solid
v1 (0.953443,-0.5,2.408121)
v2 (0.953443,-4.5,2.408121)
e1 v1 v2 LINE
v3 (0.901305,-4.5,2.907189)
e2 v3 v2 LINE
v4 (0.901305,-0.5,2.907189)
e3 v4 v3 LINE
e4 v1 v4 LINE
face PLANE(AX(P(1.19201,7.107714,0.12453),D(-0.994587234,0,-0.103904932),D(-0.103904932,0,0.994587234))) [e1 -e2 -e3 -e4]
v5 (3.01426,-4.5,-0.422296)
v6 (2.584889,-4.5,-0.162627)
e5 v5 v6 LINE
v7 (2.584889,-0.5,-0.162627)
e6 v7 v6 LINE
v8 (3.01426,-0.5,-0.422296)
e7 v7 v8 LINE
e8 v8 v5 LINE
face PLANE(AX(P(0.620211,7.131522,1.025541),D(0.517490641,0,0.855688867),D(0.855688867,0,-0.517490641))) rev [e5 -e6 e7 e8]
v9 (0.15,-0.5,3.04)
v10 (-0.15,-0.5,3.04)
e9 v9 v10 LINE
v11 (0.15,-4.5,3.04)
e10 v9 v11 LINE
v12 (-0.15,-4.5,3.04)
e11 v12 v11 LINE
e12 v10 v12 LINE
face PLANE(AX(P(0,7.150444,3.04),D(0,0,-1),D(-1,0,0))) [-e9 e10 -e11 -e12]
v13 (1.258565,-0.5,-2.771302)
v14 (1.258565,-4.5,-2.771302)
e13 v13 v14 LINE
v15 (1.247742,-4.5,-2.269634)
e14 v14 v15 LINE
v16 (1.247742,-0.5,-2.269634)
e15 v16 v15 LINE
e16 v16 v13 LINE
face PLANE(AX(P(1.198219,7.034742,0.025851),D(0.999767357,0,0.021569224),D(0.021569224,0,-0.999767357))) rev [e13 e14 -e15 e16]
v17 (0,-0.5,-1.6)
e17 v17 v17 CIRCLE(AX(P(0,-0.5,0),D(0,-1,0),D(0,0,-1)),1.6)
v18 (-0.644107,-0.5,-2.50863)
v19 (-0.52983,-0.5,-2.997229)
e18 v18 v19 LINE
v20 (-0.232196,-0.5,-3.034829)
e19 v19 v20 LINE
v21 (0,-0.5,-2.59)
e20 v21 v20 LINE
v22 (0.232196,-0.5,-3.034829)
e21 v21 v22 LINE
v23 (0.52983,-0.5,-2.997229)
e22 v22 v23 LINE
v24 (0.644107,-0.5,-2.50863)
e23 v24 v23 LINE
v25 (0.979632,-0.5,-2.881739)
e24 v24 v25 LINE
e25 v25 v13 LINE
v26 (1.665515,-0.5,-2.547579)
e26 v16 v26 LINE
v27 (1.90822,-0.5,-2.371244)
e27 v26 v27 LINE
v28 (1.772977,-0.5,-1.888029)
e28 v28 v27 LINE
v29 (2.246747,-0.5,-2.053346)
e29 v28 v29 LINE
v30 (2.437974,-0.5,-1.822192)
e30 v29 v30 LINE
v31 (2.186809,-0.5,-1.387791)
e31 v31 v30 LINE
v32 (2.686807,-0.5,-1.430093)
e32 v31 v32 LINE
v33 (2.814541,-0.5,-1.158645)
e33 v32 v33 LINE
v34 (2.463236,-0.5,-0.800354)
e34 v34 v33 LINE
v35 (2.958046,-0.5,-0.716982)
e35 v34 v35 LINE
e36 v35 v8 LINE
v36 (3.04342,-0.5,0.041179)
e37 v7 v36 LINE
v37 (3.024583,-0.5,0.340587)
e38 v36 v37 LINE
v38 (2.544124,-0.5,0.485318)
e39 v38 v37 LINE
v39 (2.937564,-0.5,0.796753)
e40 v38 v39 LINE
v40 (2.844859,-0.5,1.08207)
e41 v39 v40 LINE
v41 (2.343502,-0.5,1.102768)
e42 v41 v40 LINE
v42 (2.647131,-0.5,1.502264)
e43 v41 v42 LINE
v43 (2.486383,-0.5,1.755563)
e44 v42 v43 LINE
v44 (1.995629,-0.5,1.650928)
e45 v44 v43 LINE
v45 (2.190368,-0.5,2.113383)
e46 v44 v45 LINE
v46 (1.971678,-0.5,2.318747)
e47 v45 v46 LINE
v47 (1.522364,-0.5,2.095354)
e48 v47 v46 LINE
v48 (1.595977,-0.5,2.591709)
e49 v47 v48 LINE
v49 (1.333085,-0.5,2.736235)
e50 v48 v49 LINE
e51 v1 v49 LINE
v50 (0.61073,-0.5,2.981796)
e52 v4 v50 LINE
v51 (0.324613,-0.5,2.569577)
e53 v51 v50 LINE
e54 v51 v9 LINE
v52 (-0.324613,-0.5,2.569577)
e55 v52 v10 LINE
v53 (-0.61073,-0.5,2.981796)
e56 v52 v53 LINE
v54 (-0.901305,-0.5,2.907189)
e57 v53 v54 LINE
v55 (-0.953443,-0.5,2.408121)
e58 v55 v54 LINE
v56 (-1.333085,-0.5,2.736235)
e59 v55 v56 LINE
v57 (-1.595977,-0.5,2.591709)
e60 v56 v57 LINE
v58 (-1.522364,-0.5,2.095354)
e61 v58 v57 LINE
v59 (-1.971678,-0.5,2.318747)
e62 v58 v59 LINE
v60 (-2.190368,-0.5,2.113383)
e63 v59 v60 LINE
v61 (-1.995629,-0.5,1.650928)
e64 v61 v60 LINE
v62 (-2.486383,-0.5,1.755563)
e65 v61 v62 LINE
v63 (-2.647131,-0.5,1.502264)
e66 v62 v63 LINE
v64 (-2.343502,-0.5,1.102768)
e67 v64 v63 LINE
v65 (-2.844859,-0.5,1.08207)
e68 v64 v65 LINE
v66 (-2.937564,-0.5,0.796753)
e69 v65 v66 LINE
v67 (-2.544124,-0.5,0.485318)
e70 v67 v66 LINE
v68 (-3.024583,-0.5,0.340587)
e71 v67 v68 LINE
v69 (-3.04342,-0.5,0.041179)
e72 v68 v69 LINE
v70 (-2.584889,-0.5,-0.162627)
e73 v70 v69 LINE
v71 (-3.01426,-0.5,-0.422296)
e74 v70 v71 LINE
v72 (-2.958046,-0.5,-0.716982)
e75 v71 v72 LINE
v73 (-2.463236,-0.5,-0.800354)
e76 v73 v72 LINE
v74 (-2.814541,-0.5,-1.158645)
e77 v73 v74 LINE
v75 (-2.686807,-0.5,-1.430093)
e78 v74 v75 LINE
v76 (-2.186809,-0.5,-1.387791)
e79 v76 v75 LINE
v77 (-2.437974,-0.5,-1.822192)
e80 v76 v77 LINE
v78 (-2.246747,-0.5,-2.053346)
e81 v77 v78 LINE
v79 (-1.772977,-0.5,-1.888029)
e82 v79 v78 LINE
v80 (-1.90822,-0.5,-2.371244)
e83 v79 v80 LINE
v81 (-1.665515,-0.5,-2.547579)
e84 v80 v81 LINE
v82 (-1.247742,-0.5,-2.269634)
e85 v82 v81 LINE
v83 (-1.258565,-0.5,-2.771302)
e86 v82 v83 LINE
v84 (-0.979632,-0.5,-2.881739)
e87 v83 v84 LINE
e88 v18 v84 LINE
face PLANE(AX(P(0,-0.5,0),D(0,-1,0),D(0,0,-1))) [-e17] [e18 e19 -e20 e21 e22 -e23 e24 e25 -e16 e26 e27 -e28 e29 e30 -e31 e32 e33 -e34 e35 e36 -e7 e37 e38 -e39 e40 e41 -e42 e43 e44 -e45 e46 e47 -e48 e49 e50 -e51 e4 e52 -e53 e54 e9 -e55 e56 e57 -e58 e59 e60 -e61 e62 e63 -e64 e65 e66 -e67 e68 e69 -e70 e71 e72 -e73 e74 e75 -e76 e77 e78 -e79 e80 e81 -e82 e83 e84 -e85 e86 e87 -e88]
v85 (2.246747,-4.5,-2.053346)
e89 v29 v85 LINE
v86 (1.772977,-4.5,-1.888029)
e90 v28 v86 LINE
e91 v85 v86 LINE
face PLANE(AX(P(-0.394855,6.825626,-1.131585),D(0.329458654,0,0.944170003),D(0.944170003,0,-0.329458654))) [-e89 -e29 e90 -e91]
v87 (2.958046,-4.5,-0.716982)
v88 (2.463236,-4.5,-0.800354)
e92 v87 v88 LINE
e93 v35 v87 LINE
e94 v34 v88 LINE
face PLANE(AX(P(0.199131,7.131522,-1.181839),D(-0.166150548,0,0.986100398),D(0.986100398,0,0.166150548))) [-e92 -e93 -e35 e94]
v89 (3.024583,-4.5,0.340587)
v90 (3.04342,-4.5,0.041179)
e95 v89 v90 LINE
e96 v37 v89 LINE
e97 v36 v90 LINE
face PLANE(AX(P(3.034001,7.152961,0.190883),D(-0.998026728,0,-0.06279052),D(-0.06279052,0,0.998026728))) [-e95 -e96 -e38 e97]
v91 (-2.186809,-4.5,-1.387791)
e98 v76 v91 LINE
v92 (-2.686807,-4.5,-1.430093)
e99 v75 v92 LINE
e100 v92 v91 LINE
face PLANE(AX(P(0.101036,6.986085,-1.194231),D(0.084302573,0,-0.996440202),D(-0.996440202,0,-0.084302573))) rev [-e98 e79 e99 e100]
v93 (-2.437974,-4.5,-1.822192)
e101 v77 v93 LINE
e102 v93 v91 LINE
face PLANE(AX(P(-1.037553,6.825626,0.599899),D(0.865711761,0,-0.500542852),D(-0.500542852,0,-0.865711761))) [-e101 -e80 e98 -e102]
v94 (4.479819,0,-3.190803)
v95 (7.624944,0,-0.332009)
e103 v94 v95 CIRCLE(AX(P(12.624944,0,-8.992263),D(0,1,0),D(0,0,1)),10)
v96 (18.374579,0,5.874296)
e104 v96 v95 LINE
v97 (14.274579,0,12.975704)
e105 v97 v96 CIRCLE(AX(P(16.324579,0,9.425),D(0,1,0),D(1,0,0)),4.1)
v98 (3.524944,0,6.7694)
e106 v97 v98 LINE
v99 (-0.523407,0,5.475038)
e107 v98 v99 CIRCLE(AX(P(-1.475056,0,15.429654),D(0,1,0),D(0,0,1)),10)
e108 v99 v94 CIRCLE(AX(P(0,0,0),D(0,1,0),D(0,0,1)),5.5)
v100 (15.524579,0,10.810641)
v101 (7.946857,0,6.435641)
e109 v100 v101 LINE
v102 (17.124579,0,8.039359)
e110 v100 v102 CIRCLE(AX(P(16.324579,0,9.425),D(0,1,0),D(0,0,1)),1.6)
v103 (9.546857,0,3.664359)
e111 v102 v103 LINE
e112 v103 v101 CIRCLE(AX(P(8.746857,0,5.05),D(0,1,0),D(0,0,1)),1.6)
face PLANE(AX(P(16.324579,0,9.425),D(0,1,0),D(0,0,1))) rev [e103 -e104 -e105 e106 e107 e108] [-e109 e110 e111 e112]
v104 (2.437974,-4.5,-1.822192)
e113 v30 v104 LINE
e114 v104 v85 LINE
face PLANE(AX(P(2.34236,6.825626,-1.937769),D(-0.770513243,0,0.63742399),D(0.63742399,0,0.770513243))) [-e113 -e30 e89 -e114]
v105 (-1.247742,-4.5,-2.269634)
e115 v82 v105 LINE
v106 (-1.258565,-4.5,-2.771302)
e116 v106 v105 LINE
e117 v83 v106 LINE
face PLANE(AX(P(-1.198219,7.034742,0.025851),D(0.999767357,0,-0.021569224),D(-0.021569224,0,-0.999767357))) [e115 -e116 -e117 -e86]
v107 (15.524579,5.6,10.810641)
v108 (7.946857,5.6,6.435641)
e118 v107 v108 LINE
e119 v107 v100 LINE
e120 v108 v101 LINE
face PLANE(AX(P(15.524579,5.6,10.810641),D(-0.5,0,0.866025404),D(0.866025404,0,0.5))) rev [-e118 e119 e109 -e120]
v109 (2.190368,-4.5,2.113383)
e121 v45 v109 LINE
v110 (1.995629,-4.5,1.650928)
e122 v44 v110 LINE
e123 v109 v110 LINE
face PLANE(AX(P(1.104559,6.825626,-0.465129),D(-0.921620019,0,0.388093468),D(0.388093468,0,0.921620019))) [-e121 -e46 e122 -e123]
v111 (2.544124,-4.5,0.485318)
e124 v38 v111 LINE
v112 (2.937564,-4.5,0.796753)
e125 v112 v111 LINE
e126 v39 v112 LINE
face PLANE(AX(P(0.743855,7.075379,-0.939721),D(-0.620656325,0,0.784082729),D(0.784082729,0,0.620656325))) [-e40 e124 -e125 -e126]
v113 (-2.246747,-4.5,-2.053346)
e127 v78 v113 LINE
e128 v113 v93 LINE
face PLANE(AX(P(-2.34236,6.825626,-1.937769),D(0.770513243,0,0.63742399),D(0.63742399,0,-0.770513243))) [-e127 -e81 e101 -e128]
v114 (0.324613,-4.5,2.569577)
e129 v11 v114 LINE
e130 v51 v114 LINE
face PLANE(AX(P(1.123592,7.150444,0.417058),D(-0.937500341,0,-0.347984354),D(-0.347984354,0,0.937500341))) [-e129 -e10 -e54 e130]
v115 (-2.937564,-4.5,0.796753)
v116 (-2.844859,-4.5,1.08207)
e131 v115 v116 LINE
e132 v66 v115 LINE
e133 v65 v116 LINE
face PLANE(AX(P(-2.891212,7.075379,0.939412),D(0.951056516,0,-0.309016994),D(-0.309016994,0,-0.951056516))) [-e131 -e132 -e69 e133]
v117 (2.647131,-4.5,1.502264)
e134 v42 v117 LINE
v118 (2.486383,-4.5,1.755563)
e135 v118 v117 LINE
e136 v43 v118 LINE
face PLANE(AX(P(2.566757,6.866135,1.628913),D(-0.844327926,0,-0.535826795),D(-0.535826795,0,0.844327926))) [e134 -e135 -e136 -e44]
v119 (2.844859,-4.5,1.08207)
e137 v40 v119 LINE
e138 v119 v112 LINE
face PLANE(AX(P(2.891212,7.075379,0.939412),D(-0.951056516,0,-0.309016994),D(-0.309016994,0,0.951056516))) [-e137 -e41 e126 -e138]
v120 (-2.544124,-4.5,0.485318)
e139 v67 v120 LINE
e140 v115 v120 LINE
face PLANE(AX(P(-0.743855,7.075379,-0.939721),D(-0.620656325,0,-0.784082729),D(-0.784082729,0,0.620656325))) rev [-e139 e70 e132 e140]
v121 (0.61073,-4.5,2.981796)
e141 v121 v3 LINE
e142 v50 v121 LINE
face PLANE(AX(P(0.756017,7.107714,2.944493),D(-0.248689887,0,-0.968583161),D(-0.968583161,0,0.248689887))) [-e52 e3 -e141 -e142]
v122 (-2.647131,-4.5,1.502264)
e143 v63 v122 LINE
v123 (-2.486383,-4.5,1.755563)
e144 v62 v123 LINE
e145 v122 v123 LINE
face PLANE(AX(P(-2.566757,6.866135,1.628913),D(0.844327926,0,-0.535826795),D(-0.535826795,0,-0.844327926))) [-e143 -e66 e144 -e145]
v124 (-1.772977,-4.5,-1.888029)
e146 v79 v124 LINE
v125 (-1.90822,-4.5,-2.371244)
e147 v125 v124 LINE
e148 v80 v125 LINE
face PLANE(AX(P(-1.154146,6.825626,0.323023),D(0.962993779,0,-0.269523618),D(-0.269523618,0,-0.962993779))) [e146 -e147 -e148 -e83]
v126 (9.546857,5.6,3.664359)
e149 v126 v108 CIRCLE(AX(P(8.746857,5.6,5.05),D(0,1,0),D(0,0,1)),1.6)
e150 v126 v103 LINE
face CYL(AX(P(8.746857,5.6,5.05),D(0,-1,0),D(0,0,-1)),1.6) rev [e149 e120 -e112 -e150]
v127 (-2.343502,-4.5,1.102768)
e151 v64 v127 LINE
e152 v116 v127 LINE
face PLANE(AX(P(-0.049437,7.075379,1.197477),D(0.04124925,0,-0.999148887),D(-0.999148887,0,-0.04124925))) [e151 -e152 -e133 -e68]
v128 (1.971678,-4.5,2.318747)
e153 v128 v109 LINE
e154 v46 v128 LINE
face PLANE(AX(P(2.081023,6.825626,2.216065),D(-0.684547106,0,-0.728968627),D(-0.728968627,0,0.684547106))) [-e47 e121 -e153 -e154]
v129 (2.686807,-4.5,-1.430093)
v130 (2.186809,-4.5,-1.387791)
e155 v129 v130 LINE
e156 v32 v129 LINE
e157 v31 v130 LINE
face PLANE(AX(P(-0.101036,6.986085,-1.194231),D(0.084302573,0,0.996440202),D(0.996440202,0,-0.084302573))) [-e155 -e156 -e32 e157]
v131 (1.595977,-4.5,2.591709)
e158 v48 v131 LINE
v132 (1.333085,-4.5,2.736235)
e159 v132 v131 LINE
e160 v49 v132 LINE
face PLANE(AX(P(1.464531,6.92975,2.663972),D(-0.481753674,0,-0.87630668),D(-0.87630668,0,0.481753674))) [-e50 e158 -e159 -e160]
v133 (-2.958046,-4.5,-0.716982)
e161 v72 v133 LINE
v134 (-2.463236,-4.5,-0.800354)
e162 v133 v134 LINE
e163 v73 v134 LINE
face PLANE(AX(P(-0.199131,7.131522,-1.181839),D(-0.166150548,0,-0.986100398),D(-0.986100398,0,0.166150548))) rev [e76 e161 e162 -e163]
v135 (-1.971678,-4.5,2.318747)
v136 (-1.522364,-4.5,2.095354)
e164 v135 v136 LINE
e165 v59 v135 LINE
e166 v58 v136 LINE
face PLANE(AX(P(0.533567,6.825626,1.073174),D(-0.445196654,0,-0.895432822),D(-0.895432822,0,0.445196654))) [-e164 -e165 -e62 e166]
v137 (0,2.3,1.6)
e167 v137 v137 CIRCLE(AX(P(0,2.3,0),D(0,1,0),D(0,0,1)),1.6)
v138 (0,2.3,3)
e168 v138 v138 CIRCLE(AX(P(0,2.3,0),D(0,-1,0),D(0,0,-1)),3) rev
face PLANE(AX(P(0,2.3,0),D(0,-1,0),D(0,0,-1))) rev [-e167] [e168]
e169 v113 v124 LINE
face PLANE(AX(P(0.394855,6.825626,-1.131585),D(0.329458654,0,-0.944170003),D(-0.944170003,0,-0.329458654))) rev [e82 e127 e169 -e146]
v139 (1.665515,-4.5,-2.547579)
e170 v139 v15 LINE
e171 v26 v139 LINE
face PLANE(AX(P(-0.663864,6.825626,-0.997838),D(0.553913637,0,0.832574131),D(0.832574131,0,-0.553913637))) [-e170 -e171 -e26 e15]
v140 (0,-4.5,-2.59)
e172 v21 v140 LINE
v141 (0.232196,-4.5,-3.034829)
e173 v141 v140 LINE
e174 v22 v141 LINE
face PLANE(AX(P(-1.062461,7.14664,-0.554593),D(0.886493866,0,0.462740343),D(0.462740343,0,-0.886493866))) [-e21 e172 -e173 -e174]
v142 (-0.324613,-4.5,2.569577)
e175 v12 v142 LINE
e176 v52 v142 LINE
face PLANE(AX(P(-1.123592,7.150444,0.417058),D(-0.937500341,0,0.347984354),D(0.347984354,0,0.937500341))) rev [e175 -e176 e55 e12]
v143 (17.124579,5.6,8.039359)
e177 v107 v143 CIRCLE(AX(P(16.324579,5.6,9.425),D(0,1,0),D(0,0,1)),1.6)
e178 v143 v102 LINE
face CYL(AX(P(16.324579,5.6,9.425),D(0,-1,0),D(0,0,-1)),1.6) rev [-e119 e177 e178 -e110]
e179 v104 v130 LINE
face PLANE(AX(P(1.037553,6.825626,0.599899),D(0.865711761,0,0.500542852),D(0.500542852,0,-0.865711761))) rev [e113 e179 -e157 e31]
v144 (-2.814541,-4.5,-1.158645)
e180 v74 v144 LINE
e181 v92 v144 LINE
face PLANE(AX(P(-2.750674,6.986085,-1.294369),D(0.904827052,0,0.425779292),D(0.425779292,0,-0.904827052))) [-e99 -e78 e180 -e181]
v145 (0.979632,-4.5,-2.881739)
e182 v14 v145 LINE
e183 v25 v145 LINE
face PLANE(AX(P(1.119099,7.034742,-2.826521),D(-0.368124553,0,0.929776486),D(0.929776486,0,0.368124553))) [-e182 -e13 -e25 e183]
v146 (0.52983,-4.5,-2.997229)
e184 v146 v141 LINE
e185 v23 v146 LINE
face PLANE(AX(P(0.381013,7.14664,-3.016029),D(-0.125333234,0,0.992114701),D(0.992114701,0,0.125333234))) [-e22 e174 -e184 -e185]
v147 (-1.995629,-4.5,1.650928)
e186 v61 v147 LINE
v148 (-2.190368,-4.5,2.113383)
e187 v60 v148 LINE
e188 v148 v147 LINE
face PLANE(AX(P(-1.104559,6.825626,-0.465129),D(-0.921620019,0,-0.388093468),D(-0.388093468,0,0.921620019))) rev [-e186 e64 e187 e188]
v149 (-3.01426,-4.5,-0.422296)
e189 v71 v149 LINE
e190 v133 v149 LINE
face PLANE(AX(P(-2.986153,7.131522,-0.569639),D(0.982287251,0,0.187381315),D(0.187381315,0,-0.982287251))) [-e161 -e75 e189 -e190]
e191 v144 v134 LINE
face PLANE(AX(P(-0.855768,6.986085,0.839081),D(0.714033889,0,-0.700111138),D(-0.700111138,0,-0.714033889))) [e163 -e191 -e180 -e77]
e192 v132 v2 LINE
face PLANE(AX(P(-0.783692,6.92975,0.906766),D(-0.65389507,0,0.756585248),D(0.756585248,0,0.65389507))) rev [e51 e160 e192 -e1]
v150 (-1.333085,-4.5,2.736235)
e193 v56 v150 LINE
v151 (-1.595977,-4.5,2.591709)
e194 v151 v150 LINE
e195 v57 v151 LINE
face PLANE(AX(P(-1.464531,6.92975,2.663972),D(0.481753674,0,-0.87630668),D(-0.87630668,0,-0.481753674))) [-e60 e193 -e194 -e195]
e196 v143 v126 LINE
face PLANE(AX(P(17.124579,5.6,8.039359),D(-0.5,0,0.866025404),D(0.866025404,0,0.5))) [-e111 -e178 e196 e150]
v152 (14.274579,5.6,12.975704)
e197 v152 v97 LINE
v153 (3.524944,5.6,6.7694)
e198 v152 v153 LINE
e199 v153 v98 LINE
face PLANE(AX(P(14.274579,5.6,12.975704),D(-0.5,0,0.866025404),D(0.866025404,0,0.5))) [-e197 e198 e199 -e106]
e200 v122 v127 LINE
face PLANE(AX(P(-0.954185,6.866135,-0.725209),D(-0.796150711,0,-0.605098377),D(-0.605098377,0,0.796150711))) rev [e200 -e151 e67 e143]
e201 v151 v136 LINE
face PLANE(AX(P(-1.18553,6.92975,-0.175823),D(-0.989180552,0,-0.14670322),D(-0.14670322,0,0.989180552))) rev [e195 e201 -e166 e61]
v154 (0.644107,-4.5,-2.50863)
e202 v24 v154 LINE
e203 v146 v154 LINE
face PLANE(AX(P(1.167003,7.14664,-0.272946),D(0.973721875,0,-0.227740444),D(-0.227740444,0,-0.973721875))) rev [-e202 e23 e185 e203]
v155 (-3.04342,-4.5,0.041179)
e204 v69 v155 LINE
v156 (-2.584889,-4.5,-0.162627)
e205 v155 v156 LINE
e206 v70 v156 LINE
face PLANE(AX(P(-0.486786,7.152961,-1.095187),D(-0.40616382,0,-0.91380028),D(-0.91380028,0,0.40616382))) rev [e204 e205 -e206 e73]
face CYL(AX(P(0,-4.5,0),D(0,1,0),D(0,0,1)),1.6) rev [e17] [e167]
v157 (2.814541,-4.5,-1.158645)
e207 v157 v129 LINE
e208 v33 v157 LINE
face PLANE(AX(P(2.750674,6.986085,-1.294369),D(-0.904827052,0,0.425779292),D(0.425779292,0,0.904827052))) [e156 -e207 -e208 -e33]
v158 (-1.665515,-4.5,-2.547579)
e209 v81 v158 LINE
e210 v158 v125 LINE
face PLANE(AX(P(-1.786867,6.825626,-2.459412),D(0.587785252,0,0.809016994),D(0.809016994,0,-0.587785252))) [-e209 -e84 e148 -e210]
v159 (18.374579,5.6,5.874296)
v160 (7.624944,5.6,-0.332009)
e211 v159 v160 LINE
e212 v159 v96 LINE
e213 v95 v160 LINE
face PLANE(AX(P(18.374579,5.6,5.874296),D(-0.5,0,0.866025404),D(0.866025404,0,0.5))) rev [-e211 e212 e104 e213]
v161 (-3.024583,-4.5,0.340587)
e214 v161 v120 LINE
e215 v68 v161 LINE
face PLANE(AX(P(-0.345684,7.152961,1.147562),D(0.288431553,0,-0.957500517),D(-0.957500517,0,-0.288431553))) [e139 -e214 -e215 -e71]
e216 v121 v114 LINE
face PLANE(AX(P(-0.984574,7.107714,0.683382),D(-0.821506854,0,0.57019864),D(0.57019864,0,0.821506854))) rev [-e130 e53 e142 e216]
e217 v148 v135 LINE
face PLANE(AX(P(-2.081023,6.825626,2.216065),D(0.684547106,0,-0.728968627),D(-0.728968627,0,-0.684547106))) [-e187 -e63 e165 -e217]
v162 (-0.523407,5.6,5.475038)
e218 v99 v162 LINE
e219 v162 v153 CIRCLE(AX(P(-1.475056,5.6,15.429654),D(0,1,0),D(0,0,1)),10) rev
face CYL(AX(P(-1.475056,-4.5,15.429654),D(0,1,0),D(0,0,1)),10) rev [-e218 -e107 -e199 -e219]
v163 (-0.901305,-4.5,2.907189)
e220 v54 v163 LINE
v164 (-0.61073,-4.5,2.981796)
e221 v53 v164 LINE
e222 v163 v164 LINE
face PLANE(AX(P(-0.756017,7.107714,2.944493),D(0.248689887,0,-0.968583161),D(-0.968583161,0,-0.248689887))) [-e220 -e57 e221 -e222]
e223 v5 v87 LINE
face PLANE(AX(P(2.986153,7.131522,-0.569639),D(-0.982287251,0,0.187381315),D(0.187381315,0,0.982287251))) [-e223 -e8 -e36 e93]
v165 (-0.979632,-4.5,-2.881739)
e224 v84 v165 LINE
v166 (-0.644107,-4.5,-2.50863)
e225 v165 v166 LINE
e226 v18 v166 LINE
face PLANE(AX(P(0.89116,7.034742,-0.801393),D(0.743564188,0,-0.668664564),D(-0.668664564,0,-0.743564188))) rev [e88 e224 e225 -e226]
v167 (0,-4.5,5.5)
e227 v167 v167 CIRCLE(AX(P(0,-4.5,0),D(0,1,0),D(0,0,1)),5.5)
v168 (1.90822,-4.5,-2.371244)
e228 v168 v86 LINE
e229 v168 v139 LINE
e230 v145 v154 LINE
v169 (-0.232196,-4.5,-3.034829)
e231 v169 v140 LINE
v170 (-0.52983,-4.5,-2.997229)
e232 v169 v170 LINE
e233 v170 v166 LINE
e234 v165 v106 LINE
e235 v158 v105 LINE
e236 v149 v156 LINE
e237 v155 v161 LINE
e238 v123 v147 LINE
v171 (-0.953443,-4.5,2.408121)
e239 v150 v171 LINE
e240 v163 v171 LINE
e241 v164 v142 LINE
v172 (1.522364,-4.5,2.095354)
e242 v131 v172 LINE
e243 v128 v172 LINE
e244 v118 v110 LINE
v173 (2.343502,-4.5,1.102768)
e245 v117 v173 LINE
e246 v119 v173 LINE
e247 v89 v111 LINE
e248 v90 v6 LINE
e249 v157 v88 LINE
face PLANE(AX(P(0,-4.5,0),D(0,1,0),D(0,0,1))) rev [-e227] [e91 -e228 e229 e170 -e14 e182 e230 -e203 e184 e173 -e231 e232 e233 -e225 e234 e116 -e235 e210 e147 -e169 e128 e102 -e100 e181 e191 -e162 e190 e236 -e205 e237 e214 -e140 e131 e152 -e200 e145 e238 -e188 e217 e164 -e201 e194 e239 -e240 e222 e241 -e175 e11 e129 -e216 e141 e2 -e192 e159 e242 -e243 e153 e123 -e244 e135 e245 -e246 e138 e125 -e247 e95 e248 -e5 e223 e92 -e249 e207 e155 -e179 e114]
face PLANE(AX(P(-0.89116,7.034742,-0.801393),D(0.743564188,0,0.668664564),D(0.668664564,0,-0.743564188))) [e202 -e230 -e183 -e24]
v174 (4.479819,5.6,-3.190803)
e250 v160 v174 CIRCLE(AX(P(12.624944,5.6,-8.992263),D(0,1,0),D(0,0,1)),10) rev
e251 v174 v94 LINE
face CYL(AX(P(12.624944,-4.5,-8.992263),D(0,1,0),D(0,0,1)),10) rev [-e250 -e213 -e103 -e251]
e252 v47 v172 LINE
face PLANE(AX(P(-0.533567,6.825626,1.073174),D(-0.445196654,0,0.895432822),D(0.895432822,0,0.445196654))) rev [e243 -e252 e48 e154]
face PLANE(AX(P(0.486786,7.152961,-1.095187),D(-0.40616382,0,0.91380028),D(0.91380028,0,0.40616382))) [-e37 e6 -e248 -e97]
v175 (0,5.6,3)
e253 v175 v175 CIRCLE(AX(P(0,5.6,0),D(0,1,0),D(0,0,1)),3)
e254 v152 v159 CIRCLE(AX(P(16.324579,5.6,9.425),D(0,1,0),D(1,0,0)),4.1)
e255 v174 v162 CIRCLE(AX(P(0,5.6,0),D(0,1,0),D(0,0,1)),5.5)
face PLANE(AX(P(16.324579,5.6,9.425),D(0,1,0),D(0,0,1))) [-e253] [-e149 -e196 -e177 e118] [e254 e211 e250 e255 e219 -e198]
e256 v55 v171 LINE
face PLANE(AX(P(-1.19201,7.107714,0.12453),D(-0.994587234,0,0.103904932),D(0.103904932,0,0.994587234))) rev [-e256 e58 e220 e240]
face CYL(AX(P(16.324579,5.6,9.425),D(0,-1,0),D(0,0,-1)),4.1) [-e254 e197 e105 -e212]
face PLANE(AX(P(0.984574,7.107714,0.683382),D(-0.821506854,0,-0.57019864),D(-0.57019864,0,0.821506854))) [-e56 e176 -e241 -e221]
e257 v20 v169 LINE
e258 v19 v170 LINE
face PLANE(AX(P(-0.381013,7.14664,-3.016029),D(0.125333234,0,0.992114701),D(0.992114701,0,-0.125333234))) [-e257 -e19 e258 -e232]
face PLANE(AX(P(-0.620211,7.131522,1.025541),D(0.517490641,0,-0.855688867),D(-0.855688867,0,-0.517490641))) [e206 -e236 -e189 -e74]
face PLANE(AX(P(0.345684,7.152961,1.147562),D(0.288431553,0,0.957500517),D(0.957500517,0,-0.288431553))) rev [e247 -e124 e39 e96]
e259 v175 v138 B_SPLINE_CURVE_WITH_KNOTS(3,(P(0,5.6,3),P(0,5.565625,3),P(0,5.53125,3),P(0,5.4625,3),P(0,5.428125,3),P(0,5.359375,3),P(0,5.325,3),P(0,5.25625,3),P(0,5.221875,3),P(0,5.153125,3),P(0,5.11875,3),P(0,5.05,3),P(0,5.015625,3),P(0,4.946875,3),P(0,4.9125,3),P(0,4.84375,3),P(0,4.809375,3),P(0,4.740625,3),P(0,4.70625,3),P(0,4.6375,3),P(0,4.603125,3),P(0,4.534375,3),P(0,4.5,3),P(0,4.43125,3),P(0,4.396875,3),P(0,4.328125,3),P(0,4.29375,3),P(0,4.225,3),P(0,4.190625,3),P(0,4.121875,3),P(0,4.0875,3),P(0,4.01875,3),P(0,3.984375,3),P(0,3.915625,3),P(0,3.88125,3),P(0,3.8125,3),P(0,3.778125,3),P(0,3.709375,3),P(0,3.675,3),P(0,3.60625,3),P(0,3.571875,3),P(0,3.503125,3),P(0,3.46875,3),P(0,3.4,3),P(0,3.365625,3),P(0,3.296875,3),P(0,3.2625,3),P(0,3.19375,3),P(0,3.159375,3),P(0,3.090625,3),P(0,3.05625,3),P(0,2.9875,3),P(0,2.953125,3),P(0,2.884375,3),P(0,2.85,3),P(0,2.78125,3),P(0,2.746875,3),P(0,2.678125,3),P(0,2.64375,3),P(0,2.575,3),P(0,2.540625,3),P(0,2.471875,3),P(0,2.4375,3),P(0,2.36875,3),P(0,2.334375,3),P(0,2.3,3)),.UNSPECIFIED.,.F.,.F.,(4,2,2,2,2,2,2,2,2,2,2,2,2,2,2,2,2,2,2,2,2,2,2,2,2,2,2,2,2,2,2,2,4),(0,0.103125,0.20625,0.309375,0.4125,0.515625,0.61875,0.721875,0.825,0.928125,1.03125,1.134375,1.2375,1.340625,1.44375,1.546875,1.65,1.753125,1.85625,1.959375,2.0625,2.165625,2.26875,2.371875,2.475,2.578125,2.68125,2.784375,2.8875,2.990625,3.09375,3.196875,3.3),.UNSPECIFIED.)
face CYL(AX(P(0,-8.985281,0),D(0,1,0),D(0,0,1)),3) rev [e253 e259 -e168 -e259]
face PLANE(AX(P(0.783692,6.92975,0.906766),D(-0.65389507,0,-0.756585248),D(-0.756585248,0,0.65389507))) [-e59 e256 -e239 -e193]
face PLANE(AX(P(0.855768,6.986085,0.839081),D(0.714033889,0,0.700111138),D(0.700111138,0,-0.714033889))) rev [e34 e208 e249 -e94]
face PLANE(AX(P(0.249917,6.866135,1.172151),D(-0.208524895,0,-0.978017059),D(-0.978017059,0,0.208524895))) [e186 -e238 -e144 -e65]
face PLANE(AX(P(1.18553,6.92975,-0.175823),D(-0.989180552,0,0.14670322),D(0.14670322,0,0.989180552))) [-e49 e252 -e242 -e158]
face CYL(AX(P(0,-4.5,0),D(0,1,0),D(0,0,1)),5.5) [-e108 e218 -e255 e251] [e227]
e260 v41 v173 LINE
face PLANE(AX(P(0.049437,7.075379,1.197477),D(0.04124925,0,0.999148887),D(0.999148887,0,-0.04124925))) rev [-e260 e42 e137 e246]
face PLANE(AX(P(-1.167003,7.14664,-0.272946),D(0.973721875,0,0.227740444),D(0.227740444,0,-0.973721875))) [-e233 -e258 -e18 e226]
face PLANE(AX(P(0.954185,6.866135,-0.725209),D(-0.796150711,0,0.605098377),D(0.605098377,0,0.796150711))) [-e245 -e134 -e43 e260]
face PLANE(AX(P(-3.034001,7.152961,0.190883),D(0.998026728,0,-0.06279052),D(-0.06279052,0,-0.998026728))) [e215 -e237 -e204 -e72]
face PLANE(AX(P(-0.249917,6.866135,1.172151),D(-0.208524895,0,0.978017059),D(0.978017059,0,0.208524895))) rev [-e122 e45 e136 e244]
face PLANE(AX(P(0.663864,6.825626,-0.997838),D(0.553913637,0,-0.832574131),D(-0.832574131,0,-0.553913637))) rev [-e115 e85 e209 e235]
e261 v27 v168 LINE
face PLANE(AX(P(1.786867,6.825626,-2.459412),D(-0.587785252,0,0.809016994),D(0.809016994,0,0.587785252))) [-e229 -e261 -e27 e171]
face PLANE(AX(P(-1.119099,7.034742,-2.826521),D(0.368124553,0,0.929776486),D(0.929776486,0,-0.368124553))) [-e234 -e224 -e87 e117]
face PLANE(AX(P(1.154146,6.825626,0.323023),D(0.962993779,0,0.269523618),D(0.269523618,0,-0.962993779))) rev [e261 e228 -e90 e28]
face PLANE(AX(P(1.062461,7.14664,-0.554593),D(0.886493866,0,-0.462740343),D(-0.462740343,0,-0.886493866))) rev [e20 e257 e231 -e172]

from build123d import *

# Parameters (mm, degrees)
EXTRUDE_THIN2_DEPTH = 5.6
BOSS_EXTRUDE1_DEPTH = 5.6
BOSS_EXTRUDE2_START = -4.5
SKETCH6_R           = 5.5
BOSS_EXTRUDE2_DEPTH = 10.1
FILLET1_R           = 10
SKETCH7_R           = 2.59
CUT_EXTRUDE3_DEPTH  = 4
CUT_EXTRUDE4_DEPTH  = 4
CIRPATTERN1_COUNT   = 25
SKETCH9_R           = 3
CUT_EXTRUDE5_DEPTH  = 3.3
SKETCH10_R          = 1.6
CUT_EXTRUDE6_DEPTH  = 26.423002314


with BuildPart() as part:
    # Sketch4 → Extrude-Thin2 (new body)
    with BuildSketch(Plane(origin=(0, 0, 0), x_dir=(1, 0, 0), z_dir=(0, 1, 0))):
        with BuildLine():
            Line((10.796856578, -1.499295844), (18.374578861, -5.874295844))
            ThreePointArc((18.374578861, -5.874295844), (19.875283017, -11.475), (14.274578861, -12.975704156))
            Line((14.274578861, -12.975704156), (6.696856578, -8.600704156))
            ThreePointArc((6.696856578, -8.600704156), (5.196152423, -3), (10.796856578, -1.499295844))
        make_face()
        with BuildLine():
            Line((9.546856578, -3.664359354), (17.124578861, -8.039359354))
            ThreePointArc((17.124578861, -8.039359354), (17.710219507, -10.225), (15.524578861, -10.810640646))
            Line((15.524578861, -10.810640646), (7.946856578, -6.435640646))
            ThreePointArc((7.946856578, -6.435640646), (7.361215932, -4.25), (9.546856578, -3.664359354))
        make_face(mode=Mode.SUBTRACT)
    extrude(amount=EXTRUDE_THIN2_DEPTH)

    # Sketch5 → Boss-Extrude1 (add)
    with BuildSketch(Plane(origin=(0, 0, 0), x_dir=(1, 0, 0), z_dir=(0, 1, 0))):
        with BuildLine():
            Line((10.796856578, -1.499295844), (2.05, 3.550704156))
            ThreePointArc((2.05, 3.550704156), (-3.550704156, 2.05), (-2.05, -3.550704156))
            Line((-2.05, -3.550704156), (6.696856578, -8.600704156))
            ThreePointArc((6.696856578, -8.600704156), (8.998238507, -9.142286296), (11.216030786, -8.323099255))
            Line((11.216030786, -8.323099255), (7.946856578, -6.435640646))
            ThreePointArc((7.946856578, -6.435640646), (7.361215932, -4.25), (9.546856578, -3.664359354))
            Line((9.546856578, -3.664359354), (12.816030786, -5.551817963))
            ThreePointArc((12.816030786, -5.551817963), (12.416571434, -3.221559989), (10.796856578, -1.499295844))
        make_face()
    extrude(amount=BOSS_EXTRUDE1_DEPTH)

    # Sketch6 → Boss-Extrude2 (add)
    with BuildSketch(Plane(origin=(0, 0, 0), x_dir=(1, 0, 0), z_dir=(0, 1, 0)).offset(BOSS_EXTRUDE2_START)):
        with Locations(Location((0, 0, 0), (0, 0, 270))):
            Circle(SKETCH6_R)
    extrude(amount=BOSS_EXTRUDE2_DEPTH)

    # Fillet1
    # the kernel refuses this fillet: 10 mm, written as the material it adds along each edge
    with BuildSketch(Plane(origin=(1.124901573, 5.6, 5.383734433), x_dir=(-0.998469356889102, 0, 0.05530771513507689), z_dir=(0, -1, 0))) as fillet1_piece_1:
        with BuildLine():
            CenterArc((3.151594855, -9.886744715), FILLET1_R, 98.631327733, 24.539188727)
            Line((-2.319730793, -1.516285011), (0, 0))
            ThreePointArc((0, 0), (0.8254177, -0.062290407), (1.6508354, 0))
        make_face()
    extrude(amount=5.6)
    with BuildSketch(Plane(origin=(5.224901573, 5.6, -1.717673878), x_dir=(0.8660254037844397, 0, 0.49999999999999806), z_dir=(0, -1, 0))) as fillet1_piece_2:
        with BuildLine():
            CenterArc((2.77133022, -10), FILLET1_R, 90, 24.539188727)
            ThreePointArc((-1.381825119, -0.903225806), (-0.65683145, -0.503752837), (0, 0))
            Line((0, 0), (2.77133022, 0))
        make_face()
    extrude(amount=5.6)

    # Sketch7 → Cut-Extrude3 (cut)
    with BuildSketch(Plane.XZ.offset(4.5)):
        with Locations(Location((0, 0, 0), (0, 0, 270))):
            Circle(SKETCH7_R)
    extrude(amount=-CUT_EXTRUDE3_DEPTH, mode=Mode.SUBTRACT)

    # Sketch8 → Cut-Extrude4 (cut)
    with BuildSketch(Plane.XZ.offset(4.5)):
        with BuildLine():
            Line((0, 3.04), (0, 2.59))
            ThreePointArc((0, 2.59), (0.162627446, 2.584889227), (0.324613075, 2.569577076))
            Line((0.324613075, 2.569577076), (0.15, 3.04))
            Line((0.15, 3.04), (0, 3.04))
        make_face()
        with BuildLine():
            ThreePointArc((-0.324613075, 2.569577076), (-0.162627446, 2.584889227), (0, 2.59))
            Line((0, 2.59), (0, 3.04))
            Line((0, 3.04), (-0.15, 3.04))
            Line((-0.15, 3.04), (-0.324613075, 2.569577076))
        make_face()
    cut_extrude4 = extrude(amount=-CUT_EXTRUDE4_DEPTH, mode=Mode.SUBTRACT)

    # CirPattern1: Cut-Extrude4 ×25 about axis
    cirpattern1_axis = Axis((0, 0, 0), (0, 1, 0))
    for i in range(1, CIRPATTERN1_COUNT):
        add(cut_extrude4.rotate(cirpattern1_axis, i * 360 / CIRPATTERN1_COUNT), mode=Mode.SUBTRACT)

    # Sketch9 → Cut-Extrude5 (cut)
    with BuildSketch(Plane(origin=(0, 5.6, 0), x_dir=(1, 0, 0), z_dir=(0, 1, 0))):
        with Locations(Location((0, 0, 0), (0, 0, 270))):
            Circle(SKETCH9_R)
    extrude(amount=-CUT_EXTRUDE5_DEPTH, mode=Mode.SUBTRACT)

    # Sketch10 → Cut-Extrude6 (cut, through all)
    with BuildSketch(Plane(origin=(0, 2.3, 0), x_dir=(1, 0, 0), z_dir=(0, 1, 0))):
        with Locations(Location((0, 0, 0), (0, 0, 270))):
            Circle(SKETCH10_R)
    extrude(amount=-CUT_EXTRUDE6_DEPTH, mode=Mode.SUBTRACT)


solid = part.part
